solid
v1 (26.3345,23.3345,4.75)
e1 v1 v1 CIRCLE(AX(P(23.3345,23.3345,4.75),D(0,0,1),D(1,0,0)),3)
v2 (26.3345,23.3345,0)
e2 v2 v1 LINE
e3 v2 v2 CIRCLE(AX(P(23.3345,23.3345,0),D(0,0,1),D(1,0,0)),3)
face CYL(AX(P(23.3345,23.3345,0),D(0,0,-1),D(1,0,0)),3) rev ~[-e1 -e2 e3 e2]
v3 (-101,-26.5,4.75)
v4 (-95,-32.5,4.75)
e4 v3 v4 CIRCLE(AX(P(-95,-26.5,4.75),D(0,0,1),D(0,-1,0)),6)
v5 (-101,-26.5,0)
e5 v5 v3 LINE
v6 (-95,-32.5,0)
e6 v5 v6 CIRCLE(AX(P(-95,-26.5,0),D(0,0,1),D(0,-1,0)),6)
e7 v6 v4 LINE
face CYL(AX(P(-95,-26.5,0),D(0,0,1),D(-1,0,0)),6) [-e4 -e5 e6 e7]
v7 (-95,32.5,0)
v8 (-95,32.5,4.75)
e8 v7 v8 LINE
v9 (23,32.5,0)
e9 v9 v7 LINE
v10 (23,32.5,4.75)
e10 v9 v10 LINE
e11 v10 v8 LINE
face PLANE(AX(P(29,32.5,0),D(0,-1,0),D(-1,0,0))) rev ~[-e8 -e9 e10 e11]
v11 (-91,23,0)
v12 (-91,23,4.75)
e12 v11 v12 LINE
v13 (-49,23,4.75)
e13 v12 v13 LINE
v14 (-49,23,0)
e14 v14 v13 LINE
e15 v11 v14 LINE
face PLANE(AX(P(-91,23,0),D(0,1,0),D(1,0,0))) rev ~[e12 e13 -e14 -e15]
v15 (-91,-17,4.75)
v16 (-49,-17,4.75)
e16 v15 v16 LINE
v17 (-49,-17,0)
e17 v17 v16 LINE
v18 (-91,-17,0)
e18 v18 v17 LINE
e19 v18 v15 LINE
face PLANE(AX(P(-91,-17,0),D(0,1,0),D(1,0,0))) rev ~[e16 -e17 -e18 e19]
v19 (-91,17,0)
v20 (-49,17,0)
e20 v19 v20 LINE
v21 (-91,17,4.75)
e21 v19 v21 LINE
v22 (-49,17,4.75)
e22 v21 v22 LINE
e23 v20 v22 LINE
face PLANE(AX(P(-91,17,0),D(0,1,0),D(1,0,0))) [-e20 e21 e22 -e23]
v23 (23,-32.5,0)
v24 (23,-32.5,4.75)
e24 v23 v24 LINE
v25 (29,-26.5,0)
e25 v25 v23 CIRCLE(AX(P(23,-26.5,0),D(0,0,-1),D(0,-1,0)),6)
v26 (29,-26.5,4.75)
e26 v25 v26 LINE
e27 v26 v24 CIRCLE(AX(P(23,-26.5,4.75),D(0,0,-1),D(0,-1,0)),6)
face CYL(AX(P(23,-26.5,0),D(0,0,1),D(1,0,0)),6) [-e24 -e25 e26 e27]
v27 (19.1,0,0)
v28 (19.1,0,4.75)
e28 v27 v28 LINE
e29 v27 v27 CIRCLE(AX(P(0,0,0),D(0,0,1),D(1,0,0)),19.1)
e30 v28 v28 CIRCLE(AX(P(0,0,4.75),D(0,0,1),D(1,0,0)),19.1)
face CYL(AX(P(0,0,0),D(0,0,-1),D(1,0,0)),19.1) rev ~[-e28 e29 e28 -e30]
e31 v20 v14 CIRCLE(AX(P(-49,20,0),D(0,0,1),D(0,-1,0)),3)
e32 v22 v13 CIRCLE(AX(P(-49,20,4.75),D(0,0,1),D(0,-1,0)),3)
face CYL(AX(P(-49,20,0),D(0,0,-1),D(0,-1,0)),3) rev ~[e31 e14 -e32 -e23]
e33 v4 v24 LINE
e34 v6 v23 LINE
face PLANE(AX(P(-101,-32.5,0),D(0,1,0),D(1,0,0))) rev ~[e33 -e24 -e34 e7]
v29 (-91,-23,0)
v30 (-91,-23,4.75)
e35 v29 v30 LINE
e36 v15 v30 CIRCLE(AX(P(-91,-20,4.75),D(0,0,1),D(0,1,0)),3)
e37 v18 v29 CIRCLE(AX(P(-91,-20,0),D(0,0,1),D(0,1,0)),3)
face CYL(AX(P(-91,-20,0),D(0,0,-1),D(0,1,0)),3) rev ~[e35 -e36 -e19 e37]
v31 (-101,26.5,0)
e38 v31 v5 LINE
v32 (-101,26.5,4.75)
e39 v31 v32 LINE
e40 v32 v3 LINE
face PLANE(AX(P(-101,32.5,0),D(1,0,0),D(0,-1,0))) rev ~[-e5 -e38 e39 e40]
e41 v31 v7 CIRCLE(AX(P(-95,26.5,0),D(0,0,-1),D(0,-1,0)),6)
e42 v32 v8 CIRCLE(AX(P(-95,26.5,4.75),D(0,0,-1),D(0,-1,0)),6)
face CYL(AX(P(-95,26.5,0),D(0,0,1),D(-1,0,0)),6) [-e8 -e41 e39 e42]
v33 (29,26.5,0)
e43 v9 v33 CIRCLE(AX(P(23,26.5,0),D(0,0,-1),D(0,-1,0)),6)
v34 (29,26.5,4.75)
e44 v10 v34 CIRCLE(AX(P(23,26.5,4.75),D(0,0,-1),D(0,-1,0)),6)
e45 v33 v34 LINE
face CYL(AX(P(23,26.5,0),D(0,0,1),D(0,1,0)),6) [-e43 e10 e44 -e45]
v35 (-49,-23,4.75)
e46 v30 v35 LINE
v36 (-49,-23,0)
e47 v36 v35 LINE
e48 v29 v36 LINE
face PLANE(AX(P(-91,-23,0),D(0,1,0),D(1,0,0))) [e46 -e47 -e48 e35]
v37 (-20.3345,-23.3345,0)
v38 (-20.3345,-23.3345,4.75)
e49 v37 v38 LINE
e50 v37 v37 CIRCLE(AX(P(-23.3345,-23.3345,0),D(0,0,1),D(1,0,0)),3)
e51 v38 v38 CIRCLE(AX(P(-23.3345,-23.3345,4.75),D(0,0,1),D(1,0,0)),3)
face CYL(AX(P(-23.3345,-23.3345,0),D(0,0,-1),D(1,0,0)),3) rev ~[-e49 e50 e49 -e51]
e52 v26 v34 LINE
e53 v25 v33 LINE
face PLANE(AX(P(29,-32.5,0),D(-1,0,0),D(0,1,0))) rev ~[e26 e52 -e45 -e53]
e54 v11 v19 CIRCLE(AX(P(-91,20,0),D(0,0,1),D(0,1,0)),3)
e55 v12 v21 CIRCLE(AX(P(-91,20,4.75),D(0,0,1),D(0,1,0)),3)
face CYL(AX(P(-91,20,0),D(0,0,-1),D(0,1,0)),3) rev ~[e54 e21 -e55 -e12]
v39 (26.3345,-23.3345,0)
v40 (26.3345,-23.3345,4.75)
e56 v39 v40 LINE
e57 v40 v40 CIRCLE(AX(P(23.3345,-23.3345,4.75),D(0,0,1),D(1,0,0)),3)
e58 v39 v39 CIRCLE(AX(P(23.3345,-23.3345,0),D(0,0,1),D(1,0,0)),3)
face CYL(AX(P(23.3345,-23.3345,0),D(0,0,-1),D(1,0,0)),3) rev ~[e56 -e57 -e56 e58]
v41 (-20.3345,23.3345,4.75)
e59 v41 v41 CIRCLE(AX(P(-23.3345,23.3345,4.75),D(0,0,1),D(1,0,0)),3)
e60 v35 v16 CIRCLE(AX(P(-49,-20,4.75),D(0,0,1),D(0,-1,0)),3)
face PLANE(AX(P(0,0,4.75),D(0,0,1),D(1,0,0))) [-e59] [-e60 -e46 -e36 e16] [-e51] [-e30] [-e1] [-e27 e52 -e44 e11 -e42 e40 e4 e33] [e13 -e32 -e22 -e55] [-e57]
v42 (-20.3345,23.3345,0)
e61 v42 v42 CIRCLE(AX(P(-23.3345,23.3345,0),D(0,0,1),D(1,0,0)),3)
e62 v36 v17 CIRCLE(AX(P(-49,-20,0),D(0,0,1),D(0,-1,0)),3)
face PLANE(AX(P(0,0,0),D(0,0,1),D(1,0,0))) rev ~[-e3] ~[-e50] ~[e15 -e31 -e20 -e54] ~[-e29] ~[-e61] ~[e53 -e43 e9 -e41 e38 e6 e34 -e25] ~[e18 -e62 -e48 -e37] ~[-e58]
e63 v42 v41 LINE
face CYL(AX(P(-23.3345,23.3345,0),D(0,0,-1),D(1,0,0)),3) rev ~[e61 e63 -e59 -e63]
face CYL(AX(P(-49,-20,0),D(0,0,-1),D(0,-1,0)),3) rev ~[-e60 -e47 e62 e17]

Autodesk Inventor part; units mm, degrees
ref_plane "YZ Plane" through (0, 0, 0) normal (1, 0, 0) x (0, 1, 0)
ref_plane "XZ Plane" through (0, 0, 0) normal (0, 1, 0) x (-1, 0, 0)
ref_plane "XY Plane" through (0, 0, 0) normal (0, 0, 1) x (1, 0, 0)
sketch "Sketch1" plane through (0, 0, 0) normal (0, 0, 1) x (1, 0, 0)
  circle A0 centre (0, 0) radius 33 construction
  circle A1 centre (0, 0) radius 19.1
  line L0 (-101, -32.5) -> (29, -32.5)
  line L1 (29, -32.5) -> (29, 32.5)
  line L2 (29, 32.5) -> (-101, 32.5)
  line L3 (-101, 32.5) -> (-101, -32.5)
  line L4 (-101, -32.5) -> (29, 32.5) construction
  line L5 (29, -32.5) -> (-101, 32.5) construction
  line L6 (-101, 0) -> (29, 0) construction
  arc A2 (-91, 23) -> (-91, 17) centre (-91, 20) ccw
  line L7 (-91, 20) -> (-49, 20) construction
  arc A3 (-52, 20) -> (-49, 17) centre (-49, 20) ccw construction
  line L8 (-91, 23) -> (-49, 23)
  line L9 (-91, 17) -> (-49, 17)
  arc A4 (-88, 20) -> (-91, 23) centre (-91, 20) ccw construction
  arc A5 (-91, 17) -> (-88, 20) centre (-91, 20) ccw construction
  arc A6 (-49, 23) -> (-52, 20) centre (-49, 20) ccw construction
  arc A7 (-49, 17) -> (-49, 23) centre (-49, 20) ccw
  arc A8 (-91, -17) -> (-91, -23) centre (-91, -20) ccw
  line L10 (-91, -23) -> (-49, -23)
  line L11 (-91, -17) -> (-49, -17)
  arc A9 (-49, -23) -> (-49, -17) centre (-49, -20) ccw
  line L12 (23.3345, -23.3345) -> (-23.3345, 23.3345) construction
  line L13 (-23.3345, -23.3345) -> (23.3345, 23.3345) construction
  circle A10 centre (23.3345, 23.3345) radius 3
  circle A11 centre (-23.3345, 23.3345) radius 3
  circle A12 centre (-23.3345, -23.3345) radius 3
  circle A13 centre (23.3345, -23.3345) radius 3
  point P0 (-36, 0)
  dimension "d0" = 66
  dimension "d1" = 38.2
  dimension "d2" = 130
  dimension "d3" = 65
  dimension "d4" = 101
  dimension "d5" = 6
  dimension "d6" = 10
  dimension "d7" = 52
  dimension "d8" = 40
  dimension "d9" = 45
extrude "Plate1" add sketch "Sketch1" along normal blind 4.75
fillet "Corner Round1" radius 6 4 edges at (29, 32.5, 2.375) (29, -32.5, 2.375) (-101, -32.5, 2.375) (-101, 32.5, 2.375)
equation "\"BendRadius\" = Thickness"
equation "\"BendReliefWidth\" = Thickness"
equation "\"BendReliefDepth\" = 0.5 * Thickness"
equation "\"CornerReliefSize\" = 4 * Thickness"
equation "\"MinimumRemnant\" = 2 * Thickness"
equation "\"TransitionRadius\" = BendRadius"
equation "\"JacobiRadiusSize\" = BendRadius"
equation "\"GapSize\" = Thickness"
equation "\"d10\" = BendRadius"
equation "\"Thickness\" = 4.75"
properties part number "nema_support_1" material "Steel, Carbon"
